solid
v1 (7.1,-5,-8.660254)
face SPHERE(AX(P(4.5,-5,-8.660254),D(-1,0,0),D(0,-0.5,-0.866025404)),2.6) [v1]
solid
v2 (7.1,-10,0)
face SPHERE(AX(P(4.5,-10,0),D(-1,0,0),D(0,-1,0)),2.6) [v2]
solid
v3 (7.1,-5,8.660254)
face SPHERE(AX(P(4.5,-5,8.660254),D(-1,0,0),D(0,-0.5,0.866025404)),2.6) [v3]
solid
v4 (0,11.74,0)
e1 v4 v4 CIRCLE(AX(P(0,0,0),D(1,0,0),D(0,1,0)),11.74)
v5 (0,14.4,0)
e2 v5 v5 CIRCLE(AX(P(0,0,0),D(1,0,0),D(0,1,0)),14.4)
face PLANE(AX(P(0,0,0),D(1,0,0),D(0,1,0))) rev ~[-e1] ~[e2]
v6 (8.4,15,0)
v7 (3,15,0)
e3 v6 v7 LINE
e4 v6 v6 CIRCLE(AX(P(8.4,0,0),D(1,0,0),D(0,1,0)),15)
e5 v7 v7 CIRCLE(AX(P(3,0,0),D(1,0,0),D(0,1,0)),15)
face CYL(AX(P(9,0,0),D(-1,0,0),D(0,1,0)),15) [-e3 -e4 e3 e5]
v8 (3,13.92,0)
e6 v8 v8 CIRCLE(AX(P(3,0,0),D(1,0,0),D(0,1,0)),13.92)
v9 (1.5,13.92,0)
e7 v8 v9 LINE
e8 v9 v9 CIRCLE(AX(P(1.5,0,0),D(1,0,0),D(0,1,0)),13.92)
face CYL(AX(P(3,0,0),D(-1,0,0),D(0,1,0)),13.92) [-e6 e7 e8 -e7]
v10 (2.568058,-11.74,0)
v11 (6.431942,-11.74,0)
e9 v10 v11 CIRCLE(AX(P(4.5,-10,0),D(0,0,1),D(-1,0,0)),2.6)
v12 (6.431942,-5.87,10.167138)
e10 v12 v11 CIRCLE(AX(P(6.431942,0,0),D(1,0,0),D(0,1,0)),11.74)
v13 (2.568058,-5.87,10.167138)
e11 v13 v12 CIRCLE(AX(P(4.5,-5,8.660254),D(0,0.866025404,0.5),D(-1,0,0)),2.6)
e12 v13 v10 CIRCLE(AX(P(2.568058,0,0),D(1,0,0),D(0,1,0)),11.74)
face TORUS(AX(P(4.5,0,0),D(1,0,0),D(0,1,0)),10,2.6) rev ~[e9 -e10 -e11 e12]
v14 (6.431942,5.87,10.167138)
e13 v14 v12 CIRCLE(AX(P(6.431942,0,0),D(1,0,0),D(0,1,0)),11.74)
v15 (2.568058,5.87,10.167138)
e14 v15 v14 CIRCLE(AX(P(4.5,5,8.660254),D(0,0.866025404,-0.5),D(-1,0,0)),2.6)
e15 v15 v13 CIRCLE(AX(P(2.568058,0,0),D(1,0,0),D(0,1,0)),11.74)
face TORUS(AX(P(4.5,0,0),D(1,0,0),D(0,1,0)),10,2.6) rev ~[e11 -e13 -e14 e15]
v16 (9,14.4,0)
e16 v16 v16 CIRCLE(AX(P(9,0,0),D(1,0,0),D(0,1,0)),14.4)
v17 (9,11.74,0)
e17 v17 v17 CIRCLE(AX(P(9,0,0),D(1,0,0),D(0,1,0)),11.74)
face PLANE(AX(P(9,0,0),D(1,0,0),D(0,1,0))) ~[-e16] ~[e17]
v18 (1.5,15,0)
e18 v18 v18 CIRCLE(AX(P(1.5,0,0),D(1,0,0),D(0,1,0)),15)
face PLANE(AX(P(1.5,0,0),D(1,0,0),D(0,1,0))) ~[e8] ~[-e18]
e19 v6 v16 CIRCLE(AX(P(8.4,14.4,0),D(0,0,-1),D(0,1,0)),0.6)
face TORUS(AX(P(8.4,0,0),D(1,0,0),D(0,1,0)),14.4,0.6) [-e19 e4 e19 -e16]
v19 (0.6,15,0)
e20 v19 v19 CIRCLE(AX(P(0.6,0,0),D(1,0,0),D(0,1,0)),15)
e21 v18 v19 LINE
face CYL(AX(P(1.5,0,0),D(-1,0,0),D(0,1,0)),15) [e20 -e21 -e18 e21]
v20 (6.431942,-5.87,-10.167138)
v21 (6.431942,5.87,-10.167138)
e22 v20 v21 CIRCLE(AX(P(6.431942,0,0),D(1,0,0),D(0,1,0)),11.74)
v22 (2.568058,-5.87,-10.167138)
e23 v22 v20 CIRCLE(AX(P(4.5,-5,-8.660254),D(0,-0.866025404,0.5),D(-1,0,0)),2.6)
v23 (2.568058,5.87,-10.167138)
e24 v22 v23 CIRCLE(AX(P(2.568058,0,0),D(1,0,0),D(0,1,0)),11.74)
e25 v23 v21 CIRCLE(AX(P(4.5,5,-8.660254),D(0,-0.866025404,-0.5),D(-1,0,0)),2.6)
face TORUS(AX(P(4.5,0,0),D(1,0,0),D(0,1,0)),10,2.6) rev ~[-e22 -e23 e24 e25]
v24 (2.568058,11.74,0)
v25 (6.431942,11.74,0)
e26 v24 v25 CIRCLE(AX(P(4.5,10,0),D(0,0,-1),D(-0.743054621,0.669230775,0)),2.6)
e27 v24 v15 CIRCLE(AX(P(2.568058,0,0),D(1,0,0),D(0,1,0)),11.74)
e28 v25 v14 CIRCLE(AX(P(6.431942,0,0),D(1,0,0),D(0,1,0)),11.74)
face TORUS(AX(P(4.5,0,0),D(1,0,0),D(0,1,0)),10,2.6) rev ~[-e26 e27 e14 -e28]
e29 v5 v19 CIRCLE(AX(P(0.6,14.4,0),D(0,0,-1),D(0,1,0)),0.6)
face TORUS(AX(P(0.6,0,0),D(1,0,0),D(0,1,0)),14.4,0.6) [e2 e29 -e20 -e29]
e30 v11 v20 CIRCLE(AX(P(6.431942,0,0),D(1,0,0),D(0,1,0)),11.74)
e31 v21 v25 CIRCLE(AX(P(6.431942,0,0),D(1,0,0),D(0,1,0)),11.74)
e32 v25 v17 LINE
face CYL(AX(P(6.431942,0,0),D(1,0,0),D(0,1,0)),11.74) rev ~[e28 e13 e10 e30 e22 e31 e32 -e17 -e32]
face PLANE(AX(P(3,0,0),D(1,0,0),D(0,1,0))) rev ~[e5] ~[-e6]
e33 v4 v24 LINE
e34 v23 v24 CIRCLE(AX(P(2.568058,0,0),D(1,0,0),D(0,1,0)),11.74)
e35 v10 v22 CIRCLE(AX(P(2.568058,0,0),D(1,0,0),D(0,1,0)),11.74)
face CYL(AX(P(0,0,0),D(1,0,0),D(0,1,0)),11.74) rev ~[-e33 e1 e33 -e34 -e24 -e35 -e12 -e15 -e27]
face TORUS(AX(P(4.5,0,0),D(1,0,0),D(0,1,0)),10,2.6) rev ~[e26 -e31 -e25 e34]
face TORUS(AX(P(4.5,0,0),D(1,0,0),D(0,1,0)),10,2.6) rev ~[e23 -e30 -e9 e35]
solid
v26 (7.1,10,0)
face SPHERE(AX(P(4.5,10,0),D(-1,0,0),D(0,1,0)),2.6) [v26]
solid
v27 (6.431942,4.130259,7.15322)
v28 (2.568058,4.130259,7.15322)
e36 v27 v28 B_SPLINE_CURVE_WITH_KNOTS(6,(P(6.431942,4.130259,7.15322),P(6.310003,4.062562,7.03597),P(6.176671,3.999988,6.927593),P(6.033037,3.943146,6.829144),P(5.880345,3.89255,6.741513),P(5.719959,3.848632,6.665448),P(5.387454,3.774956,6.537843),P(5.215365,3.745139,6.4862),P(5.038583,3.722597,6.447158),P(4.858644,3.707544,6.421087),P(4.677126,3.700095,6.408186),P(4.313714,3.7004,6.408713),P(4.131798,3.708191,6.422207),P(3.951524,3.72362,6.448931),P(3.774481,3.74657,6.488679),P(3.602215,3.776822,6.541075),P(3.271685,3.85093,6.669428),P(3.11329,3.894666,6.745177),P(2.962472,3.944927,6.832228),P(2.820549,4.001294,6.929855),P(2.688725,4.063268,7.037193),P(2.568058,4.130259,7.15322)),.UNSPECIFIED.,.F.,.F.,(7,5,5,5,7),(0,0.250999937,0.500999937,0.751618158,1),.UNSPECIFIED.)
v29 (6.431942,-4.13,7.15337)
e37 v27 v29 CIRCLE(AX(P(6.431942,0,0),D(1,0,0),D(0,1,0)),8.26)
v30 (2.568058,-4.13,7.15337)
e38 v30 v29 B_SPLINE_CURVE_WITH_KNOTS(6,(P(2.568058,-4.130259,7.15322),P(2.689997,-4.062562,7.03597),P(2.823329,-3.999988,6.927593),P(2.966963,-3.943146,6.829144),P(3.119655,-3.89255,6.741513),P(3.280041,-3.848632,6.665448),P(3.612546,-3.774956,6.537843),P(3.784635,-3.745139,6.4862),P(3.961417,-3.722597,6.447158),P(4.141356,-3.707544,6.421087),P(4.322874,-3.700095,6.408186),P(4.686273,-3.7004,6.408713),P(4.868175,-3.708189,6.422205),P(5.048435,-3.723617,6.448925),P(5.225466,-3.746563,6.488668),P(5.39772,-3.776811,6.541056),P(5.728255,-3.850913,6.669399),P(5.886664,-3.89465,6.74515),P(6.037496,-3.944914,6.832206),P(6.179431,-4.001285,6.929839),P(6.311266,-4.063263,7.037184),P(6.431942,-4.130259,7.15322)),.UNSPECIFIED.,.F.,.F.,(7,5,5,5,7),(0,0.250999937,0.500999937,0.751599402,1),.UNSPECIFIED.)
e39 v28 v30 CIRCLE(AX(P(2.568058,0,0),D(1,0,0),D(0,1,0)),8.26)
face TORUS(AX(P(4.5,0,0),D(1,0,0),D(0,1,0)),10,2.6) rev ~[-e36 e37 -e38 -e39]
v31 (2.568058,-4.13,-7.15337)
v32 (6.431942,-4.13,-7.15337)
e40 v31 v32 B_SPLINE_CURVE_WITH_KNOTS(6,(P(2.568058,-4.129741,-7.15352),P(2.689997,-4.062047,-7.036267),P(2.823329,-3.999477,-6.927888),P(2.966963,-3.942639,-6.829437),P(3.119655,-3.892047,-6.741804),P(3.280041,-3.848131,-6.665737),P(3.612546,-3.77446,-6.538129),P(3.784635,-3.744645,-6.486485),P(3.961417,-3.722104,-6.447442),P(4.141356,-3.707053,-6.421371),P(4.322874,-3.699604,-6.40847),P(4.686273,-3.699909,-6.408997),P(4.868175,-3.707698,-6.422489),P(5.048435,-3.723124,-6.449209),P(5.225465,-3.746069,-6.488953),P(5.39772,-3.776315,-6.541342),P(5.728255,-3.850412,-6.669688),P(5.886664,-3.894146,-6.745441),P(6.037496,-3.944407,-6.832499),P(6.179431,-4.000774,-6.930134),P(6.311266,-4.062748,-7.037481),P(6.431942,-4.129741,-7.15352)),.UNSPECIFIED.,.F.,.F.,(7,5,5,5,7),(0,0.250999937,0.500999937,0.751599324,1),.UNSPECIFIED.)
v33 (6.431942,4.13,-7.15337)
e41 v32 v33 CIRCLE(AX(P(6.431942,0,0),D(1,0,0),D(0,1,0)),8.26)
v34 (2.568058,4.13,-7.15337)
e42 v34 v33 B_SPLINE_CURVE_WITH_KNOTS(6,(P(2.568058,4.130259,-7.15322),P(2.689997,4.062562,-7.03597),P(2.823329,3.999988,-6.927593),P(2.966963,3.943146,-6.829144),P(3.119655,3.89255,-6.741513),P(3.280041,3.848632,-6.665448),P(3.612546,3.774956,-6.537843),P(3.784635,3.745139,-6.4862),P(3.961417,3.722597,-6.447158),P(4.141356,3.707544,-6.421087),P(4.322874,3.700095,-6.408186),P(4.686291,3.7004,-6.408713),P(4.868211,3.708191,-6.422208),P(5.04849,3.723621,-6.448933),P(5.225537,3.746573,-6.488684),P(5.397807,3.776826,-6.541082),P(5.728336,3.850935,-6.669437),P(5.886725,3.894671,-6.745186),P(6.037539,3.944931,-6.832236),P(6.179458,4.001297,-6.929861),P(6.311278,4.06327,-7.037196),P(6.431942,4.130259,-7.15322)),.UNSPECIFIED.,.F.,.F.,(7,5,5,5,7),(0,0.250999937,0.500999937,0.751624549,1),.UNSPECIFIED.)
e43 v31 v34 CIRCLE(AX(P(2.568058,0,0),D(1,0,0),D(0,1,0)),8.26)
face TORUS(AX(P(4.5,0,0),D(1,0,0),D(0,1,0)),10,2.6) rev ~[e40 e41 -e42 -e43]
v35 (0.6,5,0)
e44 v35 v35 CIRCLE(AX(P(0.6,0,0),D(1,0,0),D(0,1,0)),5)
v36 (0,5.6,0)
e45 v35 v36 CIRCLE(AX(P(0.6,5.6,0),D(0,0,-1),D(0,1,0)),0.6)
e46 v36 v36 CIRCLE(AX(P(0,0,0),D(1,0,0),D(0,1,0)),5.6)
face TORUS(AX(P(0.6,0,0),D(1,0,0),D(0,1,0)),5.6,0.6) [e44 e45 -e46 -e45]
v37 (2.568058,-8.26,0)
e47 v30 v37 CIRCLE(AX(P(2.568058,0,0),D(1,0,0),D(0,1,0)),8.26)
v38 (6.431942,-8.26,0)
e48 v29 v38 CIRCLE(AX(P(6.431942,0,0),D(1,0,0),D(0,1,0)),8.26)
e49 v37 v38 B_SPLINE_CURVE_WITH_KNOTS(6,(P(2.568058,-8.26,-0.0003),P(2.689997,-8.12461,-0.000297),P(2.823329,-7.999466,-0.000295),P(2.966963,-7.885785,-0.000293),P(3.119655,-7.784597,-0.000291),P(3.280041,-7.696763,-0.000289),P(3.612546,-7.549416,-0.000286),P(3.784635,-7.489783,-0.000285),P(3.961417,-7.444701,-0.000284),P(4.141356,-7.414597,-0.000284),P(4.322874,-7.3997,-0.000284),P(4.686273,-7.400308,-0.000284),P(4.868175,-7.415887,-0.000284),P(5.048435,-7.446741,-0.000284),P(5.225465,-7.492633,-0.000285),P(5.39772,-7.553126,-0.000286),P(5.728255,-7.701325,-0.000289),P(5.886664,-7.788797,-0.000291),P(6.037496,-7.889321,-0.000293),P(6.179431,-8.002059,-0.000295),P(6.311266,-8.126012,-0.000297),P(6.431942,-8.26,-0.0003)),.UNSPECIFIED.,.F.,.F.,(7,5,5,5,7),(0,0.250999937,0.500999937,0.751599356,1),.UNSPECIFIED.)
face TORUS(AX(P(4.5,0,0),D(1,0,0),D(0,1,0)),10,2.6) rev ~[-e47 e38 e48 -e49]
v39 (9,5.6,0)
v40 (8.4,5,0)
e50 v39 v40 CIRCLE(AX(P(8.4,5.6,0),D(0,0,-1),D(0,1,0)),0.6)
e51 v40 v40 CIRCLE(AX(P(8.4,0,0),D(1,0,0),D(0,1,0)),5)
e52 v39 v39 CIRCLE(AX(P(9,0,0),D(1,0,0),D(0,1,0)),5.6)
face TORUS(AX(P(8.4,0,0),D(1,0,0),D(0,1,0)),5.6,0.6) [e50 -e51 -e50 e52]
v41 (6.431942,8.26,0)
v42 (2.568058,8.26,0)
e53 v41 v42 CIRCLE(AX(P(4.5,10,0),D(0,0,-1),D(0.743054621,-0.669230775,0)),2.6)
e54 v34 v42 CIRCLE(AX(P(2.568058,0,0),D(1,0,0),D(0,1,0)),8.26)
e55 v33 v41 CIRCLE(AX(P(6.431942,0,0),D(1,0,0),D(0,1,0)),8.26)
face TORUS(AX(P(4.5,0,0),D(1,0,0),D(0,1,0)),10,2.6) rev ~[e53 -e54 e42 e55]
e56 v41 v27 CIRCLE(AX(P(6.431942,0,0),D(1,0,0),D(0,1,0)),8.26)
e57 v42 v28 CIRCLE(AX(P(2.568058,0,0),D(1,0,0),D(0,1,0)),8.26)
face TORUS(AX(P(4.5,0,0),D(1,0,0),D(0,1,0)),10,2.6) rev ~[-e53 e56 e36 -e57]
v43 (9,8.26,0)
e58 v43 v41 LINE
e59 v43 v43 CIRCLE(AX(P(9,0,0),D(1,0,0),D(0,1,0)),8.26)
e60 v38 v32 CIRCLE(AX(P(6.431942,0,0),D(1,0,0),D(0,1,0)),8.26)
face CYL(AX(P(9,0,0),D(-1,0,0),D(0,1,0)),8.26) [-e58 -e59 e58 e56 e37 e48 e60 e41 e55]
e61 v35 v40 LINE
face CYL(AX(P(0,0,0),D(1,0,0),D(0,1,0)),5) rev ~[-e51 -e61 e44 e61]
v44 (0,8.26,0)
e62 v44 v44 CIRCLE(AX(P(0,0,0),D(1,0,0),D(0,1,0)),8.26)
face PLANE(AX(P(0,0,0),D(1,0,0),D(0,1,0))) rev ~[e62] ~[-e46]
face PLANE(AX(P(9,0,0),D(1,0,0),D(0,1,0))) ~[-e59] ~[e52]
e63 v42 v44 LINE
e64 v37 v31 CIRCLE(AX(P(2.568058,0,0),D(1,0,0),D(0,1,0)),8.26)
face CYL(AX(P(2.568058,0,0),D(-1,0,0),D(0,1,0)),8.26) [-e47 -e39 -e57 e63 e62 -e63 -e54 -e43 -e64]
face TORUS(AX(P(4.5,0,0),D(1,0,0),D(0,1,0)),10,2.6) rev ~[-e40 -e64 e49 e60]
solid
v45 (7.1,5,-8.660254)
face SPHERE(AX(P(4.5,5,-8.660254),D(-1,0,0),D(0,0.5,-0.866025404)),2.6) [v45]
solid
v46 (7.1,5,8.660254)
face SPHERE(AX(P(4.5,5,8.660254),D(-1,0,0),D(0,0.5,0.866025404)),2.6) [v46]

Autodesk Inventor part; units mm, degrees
ref_plane "YZ Plane" through (0, 0, 0) normal (1, 0, 0) x (0, 1, 0)
ref_plane "XZ Plane" through (0, 0, 0) normal (0, 1, 0) x (-1, 0, 0)
ref_plane "XY Plane" through (0, 0, 0) normal (0, 0, 1) x (1, 0, 0)
sketch "草图" plane through (0, 0, 0) normal (0, 0, 1) x (1, 0, 0)
  circle A0 centre (4.5, 10) radius 2.6
  line L0 (4.5, 10) -> (7.1, 10)
  line L1 (4.5, 10) -> (1.9, 10)
  line L2 (4.5, 7.4) -> (4.5, 12.6)
  line L3 (2.568058, 8.26) -> (0, 8.26)
  line L4 (0, 8.26) -> (0, 8.26)
  line L5 (0, 8.26) -> (0, 8.26)
  line L6 (0, 5) -> (9, 5)
  line L7 (2.568058, 11.74) -> (0, 11.74)
  line L8 (0, 11.74) -> (0, 11.74)
  line L9 (0, 11.74) -> (0, 11.74)
  line L10 (0, 15) -> (1.5, 15)
  line L11 (1.5, 15) -> (1.5, 13.92)
  line L12 (1.5, 13.92) -> (3, 13.92)
  line L13 (3, 13.92) -> (3, 15)
  line L14 (3, 15) -> (9, 15)
  line L15 (6.431942, 8.26) -> (9, 8.26)
  line L16 (9, 8.26) -> (9, 8.26)
  line L17 (9, 8.26) -> (9, 8.26)
  line L18 (9, 8.26) -> (9, 5)
  line L19 (6.431942, 11.74) -> (9, 11.74)
  line L20 (9, 11.74) -> (9, 11.74)
  line L21 (9, 11.74) -> (9, 11.74)
  line L22 (9, 11.74) -> (9, 15)
  line L23 (-3, 0) -> (18, 0)
  line L24 (0, -1.2) -> (0, 10.7)
  line L25 (0, 11.74) -> (0, 11.74)
  line L26 (0, 11.74) -> (0, 11.74)
  line L27 (0, 8.26) -> (0, 8.26)
  line L28 (0, 8.26) -> (0, 8.26)
  line L29 (9, 11.74) -> (9, 11.74)
  line L30 (9, 11.74) -> (9, 11.74)
  line L31 (9, 8.26) -> (9, 8.26)
  line L32 (9, 8.26) -> (9, 8.26)
  dimension "d0" = 5.2
  dimension "d7" = 10
  dimension "d8" = 30
  dimension "d9" = 20
  dimension "d10" = 27.84
  dimension "d11" = 16.52
  dimension "d12" = 16.52
  dimension "d13" = 16.52
  dimension "d14" = 0
  dimension "d15" = 9
  dimension "d16" = 9
  dimension "d19" = 1.5
  dimension "d20" = 3
  dimension "d22" = 4.5
sketch "草图 outline for 轴承体" plane through (0, 0, 0) normal (0, 0, 1) x (1, 0, 0)
  arc A0 (2.568058, 11.74) -> (6.431942, 11.74) centre (4.5, 10) cw
  line L0 (6.431942, 11.74) -> (9, 11.74)
  line L1 (9, 11.74) -> (9, 15)
  line L2 (9, 15) -> (3, 15)
  line L3 (3, 15) -> (3, 13.92)
  line L4 (3, 13.92) -> (1.5, 13.92)
  line L5 (1.5, 13.92) -> (1.5, 15)
  line L6 (1.5, 15) -> (0, 15)
  line L7 (0, 15) -> (0, 11.74)
  line L8 (0, 11.74) -> (2.568058, 11.74)
  arc A1 (6.431942, 8.26) -> (2.568058, 8.26) centre (4.5, 10) cw
  line L9 (2.568058, 8.26) -> (0, 8.26)
  line L10 (0, 8.26) -> (0, 5)
  line L11 (0, 5) -> (9, 5)
  line L12 (9, 5) -> (9, 8.26)
  line L13 (9, 8.26) -> (6.431942, 8.26)
revolve "轴承体" add sketch "草图 outline for 轴承体" angle 360 about axis through (-10, 0, 0) along (1, 0, 0)
fillet "圆角1" radius 0.6 4 edges at (0, -15, 0) (9, -15, 0) (0, -5, 0) (9, -5, 0)
revolve "球" add sketch "草图" angle 360 about axis through (4.5, 10, 0) along (-1, 0, 0) picked at (6.106098, 10.616648) picked at (2.79242, 10.209703) contours L0 L2 A0 | L1 A0 L2
pattern_circular "IDS_ARRAYBALL[SIMPL:T]" count 6 over 360 about axis through (-10, 0, 0) along (1, 0, 0) of "球"
equation "\"d0\" = -0.26 * WD + 0.26 * BD"
equation "\"d7\" = WD"
equation "\"d8\" = BD"
equation "\"d9\" = 0.5 * WD + 0.5 * BD"
equation "\"d10\" = BD - 2 * RT"
equation "\"d11\" = ND2"
equation "\"d12\" = ND"
equation "\"d13\" = 0.326 * BD + 0.674 * WD"
equation "\"d15\" = KB - NBR"
equation "\"d16\" = KB"
equation "\"d19\" = NBR3"
equation "\"d20\" = 2 * NBR3"
equation "\"d22\" = 0.5 * KB"
equation "\"d1\" = KRS"
equation "\"WD\" = 10"
equation "\"BD\" = 30"
equation "\"KB\" = 9"
equation "\"KRS\" = 0.6"
equation "\"ND\" = 0.674 * WD + 0.326 * BD"
equation "\"ND2\" = 0.674 * WD + 0.326 * BD"
equation "\"NBR2\" = 0"
equation "\"RT\" = 1.8 * KRS"
equation "\"NBR\" = 0"
equation "\"NBR3\" = 0.166667 * KB"
equation "\"WR\" = 0.5 * WD"
equation "\"KR1S\" = 0.5"
equation "\"BR\" = 0.5 * BD"
properties part number "滚动轴承 6200 N GB/T 276-94" material "钢，软"
